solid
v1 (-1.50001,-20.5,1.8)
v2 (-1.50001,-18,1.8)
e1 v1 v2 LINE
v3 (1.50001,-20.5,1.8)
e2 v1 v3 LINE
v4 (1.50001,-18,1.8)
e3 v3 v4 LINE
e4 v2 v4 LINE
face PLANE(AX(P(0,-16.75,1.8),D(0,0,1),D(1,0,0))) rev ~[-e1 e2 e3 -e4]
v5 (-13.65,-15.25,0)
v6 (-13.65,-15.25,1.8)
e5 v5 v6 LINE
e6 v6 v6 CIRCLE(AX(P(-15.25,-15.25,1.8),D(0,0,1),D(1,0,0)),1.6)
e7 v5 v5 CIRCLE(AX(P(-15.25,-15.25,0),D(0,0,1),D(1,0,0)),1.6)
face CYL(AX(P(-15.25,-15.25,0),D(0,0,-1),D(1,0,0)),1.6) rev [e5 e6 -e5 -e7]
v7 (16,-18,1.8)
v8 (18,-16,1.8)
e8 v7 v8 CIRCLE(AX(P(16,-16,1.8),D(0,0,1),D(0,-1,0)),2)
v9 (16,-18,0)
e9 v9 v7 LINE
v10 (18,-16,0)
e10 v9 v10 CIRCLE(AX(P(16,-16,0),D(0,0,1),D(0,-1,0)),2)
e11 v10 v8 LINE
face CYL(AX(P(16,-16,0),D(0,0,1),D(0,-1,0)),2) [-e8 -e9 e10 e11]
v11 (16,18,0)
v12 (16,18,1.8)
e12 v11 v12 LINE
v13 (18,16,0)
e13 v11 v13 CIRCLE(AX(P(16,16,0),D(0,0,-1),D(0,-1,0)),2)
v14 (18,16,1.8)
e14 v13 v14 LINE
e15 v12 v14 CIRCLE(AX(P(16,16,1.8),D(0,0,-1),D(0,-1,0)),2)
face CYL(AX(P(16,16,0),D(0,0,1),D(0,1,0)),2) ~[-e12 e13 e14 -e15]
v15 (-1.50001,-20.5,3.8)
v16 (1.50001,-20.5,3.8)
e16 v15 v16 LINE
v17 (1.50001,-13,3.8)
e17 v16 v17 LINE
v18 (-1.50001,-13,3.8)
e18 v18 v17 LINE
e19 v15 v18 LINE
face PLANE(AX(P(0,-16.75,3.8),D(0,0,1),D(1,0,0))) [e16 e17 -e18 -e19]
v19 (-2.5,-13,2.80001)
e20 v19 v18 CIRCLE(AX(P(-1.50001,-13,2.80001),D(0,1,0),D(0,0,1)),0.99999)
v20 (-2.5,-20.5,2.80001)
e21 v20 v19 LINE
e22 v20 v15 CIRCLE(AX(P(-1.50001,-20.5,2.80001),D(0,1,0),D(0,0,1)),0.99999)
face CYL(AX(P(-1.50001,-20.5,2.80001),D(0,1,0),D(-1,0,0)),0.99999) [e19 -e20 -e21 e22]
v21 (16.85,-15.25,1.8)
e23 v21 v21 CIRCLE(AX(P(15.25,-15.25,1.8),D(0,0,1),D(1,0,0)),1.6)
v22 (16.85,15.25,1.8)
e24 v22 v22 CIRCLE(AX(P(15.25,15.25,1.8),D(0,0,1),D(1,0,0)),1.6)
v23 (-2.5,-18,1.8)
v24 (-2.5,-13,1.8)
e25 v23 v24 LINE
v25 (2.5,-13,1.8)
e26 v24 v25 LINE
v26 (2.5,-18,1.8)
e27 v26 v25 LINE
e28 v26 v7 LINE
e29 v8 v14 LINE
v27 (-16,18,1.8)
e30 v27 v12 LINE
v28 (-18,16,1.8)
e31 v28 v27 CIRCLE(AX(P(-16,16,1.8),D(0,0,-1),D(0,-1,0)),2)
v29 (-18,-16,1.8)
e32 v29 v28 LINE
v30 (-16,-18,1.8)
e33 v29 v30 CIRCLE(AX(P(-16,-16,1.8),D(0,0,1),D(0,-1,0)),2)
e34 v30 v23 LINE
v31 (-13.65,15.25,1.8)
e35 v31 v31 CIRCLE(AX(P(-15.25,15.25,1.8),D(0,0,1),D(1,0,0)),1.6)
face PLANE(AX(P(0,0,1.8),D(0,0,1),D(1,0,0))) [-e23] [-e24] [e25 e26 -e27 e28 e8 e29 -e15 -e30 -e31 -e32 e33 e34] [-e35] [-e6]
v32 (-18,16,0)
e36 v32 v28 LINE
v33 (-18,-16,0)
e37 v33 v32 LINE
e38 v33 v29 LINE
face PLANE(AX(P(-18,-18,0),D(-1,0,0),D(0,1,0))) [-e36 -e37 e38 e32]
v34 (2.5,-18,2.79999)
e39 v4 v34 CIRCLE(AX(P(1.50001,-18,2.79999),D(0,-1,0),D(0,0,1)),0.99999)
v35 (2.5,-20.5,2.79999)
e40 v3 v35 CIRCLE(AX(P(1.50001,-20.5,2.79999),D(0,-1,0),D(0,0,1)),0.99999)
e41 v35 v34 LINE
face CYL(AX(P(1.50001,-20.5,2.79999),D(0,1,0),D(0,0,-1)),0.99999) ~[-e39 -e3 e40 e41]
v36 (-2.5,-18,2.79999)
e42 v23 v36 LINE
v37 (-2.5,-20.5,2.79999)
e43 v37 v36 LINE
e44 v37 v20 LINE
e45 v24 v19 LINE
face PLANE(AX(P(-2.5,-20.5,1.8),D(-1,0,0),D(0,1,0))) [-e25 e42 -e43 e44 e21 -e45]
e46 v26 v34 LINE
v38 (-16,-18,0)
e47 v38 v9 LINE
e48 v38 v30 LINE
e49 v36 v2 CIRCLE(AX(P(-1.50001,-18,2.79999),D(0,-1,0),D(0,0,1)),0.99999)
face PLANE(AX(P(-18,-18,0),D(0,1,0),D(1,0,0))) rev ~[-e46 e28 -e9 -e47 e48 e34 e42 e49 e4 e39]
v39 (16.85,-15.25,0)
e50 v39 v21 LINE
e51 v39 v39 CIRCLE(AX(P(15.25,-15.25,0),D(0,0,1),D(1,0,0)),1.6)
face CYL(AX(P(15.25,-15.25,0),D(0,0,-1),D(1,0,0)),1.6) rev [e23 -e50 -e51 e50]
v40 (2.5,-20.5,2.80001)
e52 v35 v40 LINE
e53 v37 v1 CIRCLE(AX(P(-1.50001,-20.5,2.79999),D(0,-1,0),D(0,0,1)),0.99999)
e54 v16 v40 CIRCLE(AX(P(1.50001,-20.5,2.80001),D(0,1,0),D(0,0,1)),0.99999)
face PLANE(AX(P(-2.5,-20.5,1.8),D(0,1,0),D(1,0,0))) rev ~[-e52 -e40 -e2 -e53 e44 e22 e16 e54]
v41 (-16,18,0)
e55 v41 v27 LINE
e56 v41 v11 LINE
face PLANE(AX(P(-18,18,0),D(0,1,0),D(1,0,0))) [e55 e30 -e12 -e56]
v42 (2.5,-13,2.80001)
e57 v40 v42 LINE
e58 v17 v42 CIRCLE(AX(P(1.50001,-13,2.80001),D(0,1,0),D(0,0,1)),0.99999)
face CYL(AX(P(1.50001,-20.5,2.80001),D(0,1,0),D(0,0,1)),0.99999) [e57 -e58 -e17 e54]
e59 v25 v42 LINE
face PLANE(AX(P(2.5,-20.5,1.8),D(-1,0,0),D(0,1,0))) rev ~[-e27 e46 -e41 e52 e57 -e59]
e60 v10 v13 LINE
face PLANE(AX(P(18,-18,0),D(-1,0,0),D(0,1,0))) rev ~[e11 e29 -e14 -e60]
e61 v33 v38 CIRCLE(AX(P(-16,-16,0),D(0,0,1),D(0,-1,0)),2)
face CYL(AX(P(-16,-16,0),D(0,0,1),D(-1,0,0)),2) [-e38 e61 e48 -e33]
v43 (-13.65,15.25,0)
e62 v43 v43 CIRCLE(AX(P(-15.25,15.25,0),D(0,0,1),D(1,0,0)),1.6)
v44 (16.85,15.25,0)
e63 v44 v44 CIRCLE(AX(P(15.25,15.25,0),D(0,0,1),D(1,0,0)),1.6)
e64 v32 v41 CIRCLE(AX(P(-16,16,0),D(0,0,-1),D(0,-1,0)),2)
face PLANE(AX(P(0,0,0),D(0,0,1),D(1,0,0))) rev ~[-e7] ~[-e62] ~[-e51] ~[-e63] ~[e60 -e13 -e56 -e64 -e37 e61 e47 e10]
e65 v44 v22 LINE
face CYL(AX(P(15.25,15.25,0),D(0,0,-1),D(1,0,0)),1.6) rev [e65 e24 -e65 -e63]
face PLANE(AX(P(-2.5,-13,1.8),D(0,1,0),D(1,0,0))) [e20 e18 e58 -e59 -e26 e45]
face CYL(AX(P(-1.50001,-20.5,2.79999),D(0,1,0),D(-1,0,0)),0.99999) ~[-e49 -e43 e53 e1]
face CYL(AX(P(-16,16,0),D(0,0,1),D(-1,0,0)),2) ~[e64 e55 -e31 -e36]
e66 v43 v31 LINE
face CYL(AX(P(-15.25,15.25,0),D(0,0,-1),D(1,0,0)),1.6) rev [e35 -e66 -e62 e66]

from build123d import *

# Parameters (mm, degrees)
F0_W     = 36
F0_H     = 36
F0_R     = 1.6
F1_DEPTH = 1.8
F2_R     = 2
F3_W     = 5
F3_H     = 7.5
F4_DEPTH = 2
F5_R     = 0.99999


# Not quite as in the source:
# - a fillet or chamfer is up to 0.001 mm smaller than in the source, because OpenCascade refuses the exact size


with BuildPart() as f1:
    # F0 (on Top) → F1 (new body)
    with BuildSketch(Plane.XY):
        Rectangle(F0_W, F0_H)
        with Locations((-15.25, -15.25)):
            Circle(F0_R, mode=Mode.SUBTRACT)
        with Locations((15.25, -15.25)):
            Circle(F0_R, mode=Mode.SUBTRACT)
        with Locations((-15.25, 15.25)):
            Circle(F0_R, mode=Mode.SUBTRACT)
        with Locations((15.25, 15.25)):
            Circle(F0_R, mode=Mode.SUBTRACT)
    extrude(amount=F1_DEPTH)

    # F2
    f2_edges = [f1.edges().sort_by_distance(p)[0] for p in [
        (-18, -18, 0.9),
        (18, -18, 0.9),
        (18, 18, 0.9),
        (-18, 18, 0.9),
    ]]
    fillet(f2_edges, radius=F2_R)

    # F3 (on face) → F4 (join)
    with BuildSketch(Plane.XY.offset(1.8)):
        with Locations((0, -16.75)):
            Rectangle(F3_W, F3_H)
    extrude(amount=F4_DEPTH)

    # F5 (radius 1 in the source; OpenCascade refuses exactly that, so slightly less here)
    f5_edges = [f1.edges().sort_by_distance(p)[0] for p in [
        (-2.5, -19.25, 1.8),
        (-2.5, -16.75, 3.8),
        (2.5, -16.75, 3.8),
        (2.5, -19.25, 1.8),
    ]]
    fillet(f5_edges, radius=F5_R)


solid = f1.part
